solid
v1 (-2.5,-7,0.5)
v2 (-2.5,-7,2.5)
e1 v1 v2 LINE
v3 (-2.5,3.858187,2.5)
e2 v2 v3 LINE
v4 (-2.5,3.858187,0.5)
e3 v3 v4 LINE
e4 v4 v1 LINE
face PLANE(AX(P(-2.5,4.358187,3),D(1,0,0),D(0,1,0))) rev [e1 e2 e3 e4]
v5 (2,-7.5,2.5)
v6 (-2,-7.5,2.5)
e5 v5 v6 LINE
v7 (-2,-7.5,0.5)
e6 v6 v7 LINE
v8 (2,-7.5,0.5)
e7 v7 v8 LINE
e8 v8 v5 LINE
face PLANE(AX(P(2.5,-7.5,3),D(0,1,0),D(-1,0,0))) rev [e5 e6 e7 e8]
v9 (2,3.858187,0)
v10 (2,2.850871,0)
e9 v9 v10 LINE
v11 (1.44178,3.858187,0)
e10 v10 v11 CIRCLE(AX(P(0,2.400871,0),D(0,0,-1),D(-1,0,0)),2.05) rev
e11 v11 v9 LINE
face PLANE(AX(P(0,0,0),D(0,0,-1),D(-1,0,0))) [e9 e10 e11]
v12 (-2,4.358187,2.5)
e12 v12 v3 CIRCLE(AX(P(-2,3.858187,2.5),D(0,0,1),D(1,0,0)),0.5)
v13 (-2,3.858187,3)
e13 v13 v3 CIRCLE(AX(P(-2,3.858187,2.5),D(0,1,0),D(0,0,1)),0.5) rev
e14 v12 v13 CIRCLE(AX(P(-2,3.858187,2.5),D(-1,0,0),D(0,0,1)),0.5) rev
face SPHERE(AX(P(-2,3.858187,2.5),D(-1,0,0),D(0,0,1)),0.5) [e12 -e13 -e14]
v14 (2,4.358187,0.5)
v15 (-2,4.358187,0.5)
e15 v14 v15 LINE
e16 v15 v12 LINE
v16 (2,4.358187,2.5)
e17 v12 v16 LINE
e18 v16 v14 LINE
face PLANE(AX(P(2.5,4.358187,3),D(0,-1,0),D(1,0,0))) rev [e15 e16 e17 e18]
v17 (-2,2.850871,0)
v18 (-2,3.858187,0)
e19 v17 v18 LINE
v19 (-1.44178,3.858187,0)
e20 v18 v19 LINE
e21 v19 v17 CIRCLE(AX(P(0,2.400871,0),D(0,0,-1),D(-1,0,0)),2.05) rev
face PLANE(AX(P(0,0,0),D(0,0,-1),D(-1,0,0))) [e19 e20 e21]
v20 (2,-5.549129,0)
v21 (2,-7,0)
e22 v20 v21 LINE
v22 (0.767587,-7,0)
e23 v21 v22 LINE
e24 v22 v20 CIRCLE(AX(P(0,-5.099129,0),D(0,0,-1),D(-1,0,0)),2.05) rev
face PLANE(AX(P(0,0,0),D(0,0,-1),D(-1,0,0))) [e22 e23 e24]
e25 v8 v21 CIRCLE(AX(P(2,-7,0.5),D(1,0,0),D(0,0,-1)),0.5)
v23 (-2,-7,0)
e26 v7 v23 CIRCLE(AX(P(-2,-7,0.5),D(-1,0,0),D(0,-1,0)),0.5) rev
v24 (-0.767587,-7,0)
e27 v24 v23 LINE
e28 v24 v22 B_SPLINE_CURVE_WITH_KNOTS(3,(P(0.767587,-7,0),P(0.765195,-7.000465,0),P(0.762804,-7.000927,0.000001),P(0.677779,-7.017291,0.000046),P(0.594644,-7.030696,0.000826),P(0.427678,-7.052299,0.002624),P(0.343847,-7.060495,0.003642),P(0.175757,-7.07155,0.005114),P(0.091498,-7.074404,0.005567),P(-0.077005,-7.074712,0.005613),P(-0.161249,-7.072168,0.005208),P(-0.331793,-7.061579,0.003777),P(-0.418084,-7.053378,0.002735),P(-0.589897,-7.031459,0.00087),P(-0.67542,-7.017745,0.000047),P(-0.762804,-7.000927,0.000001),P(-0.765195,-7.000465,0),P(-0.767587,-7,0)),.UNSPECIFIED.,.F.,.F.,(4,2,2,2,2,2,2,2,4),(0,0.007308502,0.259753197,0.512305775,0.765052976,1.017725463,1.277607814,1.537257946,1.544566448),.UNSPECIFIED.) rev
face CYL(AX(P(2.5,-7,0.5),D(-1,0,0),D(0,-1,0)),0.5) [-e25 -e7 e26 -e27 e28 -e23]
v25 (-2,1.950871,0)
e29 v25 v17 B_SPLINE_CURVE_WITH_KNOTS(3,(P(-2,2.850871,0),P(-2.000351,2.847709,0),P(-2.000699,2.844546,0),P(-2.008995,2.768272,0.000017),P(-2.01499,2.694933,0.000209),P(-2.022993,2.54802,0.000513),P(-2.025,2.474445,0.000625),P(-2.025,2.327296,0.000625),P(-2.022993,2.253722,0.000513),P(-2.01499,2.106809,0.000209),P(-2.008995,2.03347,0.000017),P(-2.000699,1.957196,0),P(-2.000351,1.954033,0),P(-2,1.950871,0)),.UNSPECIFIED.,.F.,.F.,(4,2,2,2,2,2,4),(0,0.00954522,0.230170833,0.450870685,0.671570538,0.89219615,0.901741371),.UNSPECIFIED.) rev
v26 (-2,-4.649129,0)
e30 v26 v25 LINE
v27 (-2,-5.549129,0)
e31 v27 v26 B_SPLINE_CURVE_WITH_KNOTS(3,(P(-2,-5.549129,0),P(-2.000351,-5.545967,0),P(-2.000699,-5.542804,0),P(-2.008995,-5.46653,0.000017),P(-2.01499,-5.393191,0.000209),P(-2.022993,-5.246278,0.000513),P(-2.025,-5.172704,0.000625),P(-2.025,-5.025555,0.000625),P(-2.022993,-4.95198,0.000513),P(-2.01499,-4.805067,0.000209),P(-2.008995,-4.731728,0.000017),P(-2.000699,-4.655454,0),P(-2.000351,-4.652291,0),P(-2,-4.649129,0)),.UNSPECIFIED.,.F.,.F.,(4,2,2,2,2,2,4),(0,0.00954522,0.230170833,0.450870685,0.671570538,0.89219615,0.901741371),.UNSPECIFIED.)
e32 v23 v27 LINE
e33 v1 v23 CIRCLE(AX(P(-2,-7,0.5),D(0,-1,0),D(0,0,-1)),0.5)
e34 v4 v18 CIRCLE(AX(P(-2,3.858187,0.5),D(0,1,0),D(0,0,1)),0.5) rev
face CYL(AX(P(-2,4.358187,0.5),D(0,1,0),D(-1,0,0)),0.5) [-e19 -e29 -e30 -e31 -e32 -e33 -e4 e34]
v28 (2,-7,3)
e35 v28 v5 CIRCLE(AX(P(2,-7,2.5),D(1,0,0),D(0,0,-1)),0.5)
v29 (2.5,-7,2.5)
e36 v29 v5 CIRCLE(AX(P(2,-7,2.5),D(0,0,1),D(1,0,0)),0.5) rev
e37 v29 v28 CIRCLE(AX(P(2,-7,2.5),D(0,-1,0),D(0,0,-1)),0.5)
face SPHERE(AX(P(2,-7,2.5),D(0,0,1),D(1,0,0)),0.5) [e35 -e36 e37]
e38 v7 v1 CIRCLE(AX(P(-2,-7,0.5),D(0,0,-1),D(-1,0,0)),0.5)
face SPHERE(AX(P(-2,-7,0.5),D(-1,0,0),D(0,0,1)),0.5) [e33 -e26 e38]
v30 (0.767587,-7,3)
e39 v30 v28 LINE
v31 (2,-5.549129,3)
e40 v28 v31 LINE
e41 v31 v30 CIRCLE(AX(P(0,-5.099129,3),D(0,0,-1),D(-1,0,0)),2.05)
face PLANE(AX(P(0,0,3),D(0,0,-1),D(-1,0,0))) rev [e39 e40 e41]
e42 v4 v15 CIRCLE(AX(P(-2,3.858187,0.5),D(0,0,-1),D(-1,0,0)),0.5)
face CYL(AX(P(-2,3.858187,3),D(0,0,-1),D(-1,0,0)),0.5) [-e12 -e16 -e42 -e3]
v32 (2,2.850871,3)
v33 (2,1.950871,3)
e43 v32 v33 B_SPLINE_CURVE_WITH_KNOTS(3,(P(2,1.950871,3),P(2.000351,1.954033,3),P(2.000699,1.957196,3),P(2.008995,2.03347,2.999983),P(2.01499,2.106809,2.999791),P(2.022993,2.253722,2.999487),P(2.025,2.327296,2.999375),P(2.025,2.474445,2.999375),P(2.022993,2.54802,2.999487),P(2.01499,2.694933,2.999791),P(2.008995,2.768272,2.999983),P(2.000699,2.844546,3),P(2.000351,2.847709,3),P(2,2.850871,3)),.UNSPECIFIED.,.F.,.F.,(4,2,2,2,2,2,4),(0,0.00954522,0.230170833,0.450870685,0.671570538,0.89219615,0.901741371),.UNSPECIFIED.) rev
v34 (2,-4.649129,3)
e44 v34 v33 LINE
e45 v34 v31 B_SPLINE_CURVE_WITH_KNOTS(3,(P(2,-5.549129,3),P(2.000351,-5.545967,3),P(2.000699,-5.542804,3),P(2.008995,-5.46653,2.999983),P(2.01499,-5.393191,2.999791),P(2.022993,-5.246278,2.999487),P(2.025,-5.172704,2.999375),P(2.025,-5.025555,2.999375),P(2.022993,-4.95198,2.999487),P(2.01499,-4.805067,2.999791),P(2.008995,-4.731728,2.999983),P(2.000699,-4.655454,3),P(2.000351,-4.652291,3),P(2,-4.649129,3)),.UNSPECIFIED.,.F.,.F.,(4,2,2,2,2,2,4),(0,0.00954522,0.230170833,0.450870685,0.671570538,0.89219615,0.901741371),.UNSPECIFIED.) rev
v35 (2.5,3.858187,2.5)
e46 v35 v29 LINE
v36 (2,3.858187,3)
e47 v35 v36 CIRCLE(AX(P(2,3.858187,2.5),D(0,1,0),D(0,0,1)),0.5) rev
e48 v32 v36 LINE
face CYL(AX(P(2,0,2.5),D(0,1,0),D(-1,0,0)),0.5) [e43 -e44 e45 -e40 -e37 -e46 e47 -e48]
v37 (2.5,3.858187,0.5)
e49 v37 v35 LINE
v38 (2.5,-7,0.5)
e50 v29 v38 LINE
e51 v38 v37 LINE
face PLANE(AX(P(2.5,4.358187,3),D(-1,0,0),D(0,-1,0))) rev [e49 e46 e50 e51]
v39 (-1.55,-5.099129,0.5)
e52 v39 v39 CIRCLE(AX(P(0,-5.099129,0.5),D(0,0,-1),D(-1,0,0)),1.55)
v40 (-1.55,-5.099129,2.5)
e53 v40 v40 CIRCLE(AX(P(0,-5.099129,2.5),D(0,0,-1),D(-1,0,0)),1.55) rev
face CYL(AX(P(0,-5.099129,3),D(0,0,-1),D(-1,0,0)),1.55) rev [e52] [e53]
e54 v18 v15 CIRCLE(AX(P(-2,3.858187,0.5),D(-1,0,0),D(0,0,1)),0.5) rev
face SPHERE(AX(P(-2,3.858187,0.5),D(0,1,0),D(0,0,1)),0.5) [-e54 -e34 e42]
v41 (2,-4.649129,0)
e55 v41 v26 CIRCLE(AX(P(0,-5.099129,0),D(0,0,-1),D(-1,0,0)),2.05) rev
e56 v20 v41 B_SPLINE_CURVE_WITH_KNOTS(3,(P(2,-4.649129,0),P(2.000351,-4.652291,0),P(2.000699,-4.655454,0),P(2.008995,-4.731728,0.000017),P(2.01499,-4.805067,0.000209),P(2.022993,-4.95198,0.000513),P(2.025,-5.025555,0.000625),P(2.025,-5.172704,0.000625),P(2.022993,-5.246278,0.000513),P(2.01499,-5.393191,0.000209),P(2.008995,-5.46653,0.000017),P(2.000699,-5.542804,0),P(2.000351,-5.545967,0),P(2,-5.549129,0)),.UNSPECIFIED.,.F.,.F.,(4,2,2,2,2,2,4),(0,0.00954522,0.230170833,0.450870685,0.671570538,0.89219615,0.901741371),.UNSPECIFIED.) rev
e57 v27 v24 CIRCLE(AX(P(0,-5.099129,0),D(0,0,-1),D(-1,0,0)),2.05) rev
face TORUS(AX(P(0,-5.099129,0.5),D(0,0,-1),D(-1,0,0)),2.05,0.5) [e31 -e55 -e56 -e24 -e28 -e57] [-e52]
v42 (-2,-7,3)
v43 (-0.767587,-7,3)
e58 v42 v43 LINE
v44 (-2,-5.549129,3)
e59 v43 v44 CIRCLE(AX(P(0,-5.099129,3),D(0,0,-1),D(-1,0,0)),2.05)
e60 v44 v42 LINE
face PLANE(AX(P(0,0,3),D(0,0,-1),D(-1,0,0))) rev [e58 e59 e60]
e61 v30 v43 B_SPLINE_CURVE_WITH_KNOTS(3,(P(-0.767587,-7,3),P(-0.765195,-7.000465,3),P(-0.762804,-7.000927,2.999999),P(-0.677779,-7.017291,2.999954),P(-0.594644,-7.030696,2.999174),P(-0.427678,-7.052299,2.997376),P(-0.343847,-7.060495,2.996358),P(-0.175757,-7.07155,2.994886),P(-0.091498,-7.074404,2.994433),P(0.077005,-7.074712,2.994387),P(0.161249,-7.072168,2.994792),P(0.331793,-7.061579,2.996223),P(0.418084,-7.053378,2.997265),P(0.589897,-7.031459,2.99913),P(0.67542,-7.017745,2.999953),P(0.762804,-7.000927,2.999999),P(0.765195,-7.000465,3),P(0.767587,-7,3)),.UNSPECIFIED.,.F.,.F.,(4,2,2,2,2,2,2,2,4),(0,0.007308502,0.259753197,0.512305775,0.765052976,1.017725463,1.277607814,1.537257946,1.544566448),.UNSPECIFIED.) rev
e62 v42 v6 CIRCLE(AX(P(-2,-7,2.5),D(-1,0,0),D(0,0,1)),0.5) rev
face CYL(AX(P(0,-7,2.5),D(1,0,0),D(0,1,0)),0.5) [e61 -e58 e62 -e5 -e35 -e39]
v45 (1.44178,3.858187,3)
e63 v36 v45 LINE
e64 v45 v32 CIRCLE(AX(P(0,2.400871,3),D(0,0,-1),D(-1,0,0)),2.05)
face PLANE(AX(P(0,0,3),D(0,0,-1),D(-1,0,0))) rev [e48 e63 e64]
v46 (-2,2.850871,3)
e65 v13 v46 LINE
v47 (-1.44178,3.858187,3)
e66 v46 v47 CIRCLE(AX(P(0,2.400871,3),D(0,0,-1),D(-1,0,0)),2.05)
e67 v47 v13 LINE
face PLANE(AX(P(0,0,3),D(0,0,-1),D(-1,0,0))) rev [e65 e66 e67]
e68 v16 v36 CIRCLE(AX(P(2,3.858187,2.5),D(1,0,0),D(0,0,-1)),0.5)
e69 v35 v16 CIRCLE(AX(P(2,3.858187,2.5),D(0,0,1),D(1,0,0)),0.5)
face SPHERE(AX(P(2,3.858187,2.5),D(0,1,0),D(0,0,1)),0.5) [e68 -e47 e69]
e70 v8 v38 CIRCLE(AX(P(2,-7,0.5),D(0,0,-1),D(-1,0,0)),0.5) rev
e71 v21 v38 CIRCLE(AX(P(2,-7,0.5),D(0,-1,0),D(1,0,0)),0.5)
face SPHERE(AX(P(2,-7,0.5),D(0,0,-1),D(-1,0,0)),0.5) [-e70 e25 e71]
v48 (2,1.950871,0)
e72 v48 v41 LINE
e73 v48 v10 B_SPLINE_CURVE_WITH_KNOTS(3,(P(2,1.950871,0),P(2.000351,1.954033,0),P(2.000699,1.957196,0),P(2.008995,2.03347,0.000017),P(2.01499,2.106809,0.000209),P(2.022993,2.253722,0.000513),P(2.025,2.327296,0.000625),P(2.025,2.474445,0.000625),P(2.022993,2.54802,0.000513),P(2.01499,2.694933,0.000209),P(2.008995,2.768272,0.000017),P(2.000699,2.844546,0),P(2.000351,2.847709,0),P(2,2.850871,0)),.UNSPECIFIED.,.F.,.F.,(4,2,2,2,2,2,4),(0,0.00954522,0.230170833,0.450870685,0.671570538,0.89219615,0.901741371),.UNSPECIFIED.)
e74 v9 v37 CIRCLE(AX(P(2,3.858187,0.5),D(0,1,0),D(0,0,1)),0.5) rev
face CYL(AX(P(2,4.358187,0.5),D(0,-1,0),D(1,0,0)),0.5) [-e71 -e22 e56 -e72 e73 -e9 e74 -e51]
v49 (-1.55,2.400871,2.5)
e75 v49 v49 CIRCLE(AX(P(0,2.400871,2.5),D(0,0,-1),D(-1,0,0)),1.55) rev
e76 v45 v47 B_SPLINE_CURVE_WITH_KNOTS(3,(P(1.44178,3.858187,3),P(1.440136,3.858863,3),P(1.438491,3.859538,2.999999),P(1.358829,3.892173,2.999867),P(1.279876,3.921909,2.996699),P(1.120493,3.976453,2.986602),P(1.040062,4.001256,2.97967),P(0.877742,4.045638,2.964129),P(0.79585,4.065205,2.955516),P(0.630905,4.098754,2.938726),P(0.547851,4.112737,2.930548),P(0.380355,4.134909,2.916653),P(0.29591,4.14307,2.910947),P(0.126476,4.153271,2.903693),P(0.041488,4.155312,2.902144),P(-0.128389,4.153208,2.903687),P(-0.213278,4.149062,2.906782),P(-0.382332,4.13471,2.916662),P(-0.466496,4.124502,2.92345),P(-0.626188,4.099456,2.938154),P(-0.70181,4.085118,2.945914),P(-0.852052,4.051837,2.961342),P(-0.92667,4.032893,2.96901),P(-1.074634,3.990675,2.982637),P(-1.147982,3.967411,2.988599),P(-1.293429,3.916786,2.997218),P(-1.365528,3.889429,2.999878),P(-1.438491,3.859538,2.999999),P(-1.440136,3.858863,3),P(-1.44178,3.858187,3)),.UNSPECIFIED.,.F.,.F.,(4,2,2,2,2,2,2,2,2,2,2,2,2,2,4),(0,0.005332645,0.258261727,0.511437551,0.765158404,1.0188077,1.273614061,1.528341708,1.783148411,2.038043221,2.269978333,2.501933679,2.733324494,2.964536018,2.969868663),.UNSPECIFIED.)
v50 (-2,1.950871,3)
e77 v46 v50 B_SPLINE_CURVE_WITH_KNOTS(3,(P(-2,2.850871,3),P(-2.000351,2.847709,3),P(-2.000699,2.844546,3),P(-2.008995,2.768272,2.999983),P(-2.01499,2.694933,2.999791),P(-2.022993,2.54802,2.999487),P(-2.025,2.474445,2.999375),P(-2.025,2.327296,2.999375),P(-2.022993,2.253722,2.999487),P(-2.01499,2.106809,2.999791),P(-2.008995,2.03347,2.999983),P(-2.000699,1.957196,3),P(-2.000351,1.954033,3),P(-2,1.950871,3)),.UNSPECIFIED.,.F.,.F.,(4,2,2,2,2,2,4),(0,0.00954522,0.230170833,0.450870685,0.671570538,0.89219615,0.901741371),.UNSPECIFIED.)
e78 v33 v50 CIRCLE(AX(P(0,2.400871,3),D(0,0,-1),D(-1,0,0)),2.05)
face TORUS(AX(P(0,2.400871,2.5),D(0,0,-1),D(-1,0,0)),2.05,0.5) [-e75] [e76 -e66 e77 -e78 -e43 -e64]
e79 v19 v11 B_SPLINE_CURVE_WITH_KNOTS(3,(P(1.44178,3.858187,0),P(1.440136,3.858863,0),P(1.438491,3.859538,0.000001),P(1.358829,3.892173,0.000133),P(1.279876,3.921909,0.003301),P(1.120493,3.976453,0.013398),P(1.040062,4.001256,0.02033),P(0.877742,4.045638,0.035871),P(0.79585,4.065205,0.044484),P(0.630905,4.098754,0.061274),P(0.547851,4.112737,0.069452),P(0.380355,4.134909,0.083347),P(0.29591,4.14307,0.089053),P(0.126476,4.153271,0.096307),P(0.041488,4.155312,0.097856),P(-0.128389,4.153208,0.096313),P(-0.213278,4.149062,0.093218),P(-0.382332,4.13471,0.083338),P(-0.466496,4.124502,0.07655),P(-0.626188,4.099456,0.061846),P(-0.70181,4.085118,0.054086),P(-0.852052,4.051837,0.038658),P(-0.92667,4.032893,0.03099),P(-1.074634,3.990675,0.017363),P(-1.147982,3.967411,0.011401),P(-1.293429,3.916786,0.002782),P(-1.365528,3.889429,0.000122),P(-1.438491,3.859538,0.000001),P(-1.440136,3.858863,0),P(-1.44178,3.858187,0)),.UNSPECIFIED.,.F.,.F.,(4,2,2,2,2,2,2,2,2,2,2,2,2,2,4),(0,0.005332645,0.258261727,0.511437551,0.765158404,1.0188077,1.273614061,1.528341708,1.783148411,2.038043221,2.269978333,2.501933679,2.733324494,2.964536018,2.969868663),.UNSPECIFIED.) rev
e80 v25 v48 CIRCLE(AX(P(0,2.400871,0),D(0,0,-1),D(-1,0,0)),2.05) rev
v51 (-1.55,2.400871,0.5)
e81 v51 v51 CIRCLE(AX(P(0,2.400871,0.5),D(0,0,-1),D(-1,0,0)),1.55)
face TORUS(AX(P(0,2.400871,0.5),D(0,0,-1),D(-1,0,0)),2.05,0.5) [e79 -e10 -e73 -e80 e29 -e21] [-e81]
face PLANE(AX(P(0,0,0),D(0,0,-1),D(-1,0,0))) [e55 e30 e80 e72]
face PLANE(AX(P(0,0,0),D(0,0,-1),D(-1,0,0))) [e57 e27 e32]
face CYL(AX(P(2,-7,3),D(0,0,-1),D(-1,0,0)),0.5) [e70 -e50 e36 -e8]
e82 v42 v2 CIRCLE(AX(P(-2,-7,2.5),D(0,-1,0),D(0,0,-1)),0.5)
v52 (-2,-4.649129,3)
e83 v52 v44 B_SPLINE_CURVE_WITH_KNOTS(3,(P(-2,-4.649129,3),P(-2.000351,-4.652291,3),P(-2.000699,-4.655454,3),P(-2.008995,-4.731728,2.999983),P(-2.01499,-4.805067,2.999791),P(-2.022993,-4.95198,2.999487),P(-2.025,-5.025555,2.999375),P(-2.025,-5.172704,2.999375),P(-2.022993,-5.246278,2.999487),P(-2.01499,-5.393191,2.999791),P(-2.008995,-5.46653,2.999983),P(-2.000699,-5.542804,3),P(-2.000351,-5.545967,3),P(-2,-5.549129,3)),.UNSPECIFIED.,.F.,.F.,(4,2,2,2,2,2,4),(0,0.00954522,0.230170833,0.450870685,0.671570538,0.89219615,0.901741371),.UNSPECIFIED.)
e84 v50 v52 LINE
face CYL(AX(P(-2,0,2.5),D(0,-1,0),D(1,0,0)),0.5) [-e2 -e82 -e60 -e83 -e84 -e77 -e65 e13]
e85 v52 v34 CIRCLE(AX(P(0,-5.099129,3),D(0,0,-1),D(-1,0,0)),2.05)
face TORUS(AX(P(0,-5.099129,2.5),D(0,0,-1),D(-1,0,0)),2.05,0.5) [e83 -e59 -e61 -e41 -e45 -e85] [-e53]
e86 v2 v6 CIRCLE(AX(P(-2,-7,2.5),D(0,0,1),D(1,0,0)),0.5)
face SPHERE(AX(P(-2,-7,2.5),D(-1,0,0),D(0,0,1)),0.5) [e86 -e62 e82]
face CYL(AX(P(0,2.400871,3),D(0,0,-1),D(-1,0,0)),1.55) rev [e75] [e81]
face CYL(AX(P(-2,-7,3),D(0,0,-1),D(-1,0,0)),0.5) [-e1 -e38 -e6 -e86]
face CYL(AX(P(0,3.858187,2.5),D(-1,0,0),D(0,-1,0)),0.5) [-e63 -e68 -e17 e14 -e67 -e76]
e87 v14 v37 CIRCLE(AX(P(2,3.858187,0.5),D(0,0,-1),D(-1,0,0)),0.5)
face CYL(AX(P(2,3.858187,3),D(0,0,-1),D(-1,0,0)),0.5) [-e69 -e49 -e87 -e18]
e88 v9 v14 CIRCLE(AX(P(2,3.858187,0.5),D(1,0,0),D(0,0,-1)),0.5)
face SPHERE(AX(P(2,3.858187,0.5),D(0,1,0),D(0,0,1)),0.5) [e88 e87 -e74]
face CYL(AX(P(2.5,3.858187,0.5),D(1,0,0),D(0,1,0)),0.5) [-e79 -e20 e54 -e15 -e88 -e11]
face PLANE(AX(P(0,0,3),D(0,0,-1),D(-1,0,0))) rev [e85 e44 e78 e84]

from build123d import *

# Parameters (mm, degrees)
SKETCH1_W           = 5
SKETCH1_H           = 11.858187168
SKETCH1_R           = 1.55
BOSS_EXTRUDE1_DEPTH = 3
FILLET1_R           = 0.5


with BuildPart() as part:
    # Sketch1 → Boss-Extrude1 (new body)
    with BuildSketch(Plane.XY):
        with Locations((0, -1.570906416)):
            Rectangle(SKETCH1_W, SKETCH1_H)
        with Locations((0, 2.400870974)):
            Circle(SKETCH1_R, mode=Mode.SUBTRACT)
        with Locations((0, -5.099129026)):
            Circle(SKETCH1_R, mode=Mode.SUBTRACT)
    extrude(amount=BOSS_EXTRUDE1_DEPTH)

    # Fillet1
    # the kernel refuses this fillet: 0.5 mm, written as the material it takes off along each edge
    with BuildSketch(Plane(origin=(2, -7, 2.5), x_dir=(1, 0, 0), z_dir=(0, -1, 0))) as fillet1_piece_1_section:
        Polygon((0, 0), (FILLET1_R, 0), (FILLET1_R, FILLET1_R), (0, FILLET1_R), align=None)
    fillet1_piece_1 = extrude(amount=FILLET1_R, mode=Mode.PRIVATE)
    fillet1_piece_1 = fillet1_piece_1 - Plane(origin=(2, -7, 2.5), x_dir=(-0.7071067811865475, 0, -0.7071067811865475), z_dir=(0, -1, 0)) * Sphere(FILLET1_R, mode=Mode.PRIVATE)
    add(fillet1_piece_1, mode=Mode.SUBTRACT)
    with BuildSketch(Plane(origin=(2, 3.858187168, 2.5), x_dir=(1, 0, 0), z_dir=(0, 1, 0))) as fillet1_piece_2_section:
        Polygon((0, 0), (FILLET1_R, 0), (FILLET1_R, -FILLET1_R), (0, -FILLET1_R), align=None)
    fillet1_piece_2 = extrude(amount=FILLET1_R, mode=Mode.PRIVATE)
    fillet1_piece_2 = fillet1_piece_2 - Plane(origin=(2, 3.858187168, 2.5), x_dir=(-0.7071067811865475, 0, -0.7071067811865475), z_dir=(0, 1, 0)) * Sphere(FILLET1_R, mode=Mode.PRIVATE)
    add(fillet1_piece_2, mode=Mode.SUBTRACT)
    with BuildSketch(Plane(origin=(-2, 3.858187168, 2.5), x_dir=(-1, 0, 0), z_dir=(0, 1, 0))) as fillet1_piece_3_section:
        Polygon((0, 0), (FILLET1_R, 0), (FILLET1_R, FILLET1_R), (0, FILLET1_R), align=None)
    fillet1_piece_3 = extrude(amount=FILLET1_R, mode=Mode.PRIVATE)
    fillet1_piece_3 = fillet1_piece_3 - Plane(origin=(-2, 3.858187168, 2.5), x_dir=(0.7071067811865475, 0, -0.7071067811865475), z_dir=(0, 1, 0)) * Sphere(FILLET1_R, mode=Mode.PRIVATE)
    add(fillet1_piece_3, mode=Mode.SUBTRACT)
    with BuildSketch(Plane(origin=(-2, -7, 2.5), x_dir=(0, -1, 0), z_dir=(-1, 0, 0))) as fillet1_piece_4_section:
        Polygon((0, 0), (FILLET1_R, 0), (FILLET1_R, FILLET1_R), (0, FILLET1_R), align=None)
    fillet1_piece_4 = extrude(amount=FILLET1_R, mode=Mode.PRIVATE)
    fillet1_piece_4 = fillet1_piece_4 - Plane(origin=(-2, -7, 2.5), x_dir=(0, 0.7071067811865475, -0.7071067811865475), z_dir=(-1, 0, 0)) * Sphere(FILLET1_R, mode=Mode.PRIVATE)
    add(fillet1_piece_4, mode=Mode.SUBTRACT)
    with BuildSketch(Plane(origin=(2, 3.858187168, 0.5), x_dir=(1, 0, 0), z_dir=(0, 1, 0))) as fillet1_piece_5_section:
        Polygon((0, 0), (FILLET1_R, 0), (FILLET1_R, FILLET1_R), (0, FILLET1_R), align=None)
    fillet1_piece_5 = extrude(amount=FILLET1_R, mode=Mode.PRIVATE)
    fillet1_piece_5 = fillet1_piece_5 - Plane(origin=(2, 3.858187168, 0.5), x_dir=(-0.7071067811865475, 0, 0.7071067811865475), z_dir=(0, 1, 0)) * Sphere(FILLET1_R, mode=Mode.PRIVATE)
    add(fillet1_piece_5, mode=Mode.SUBTRACT)
    with BuildSketch(Plane(origin=(-2, 3.858187168, 0.5), x_dir=(-1, 0, 0), z_dir=(0, 1, 0))) as fillet1_piece_6_section:
        Polygon((0, 0), (FILLET1_R, 0), (FILLET1_R, -FILLET1_R), (0, -FILLET1_R), align=None)
    fillet1_piece_6 = extrude(amount=FILLET1_R, mode=Mode.PRIVATE)
    fillet1_piece_6 = fillet1_piece_6 - Plane(origin=(-2, 3.858187168, 0.5), x_dir=(0.7071067811865475, 0, 0.7071067811865475), z_dir=(0, 1, 0)) * Sphere(FILLET1_R, mode=Mode.PRIVATE)
    add(fillet1_piece_6, mode=Mode.SUBTRACT)
    with BuildSketch(Plane(origin=(2, -7, 0.5), x_dir=(1, 0, 0), z_dir=(0, -1, 0))) as fillet1_piece_7_section:
        Polygon((0, 0), (FILLET1_R, 0), (FILLET1_R, -FILLET1_R), (0, -FILLET1_R), align=None)
    fillet1_piece_7 = extrude(amount=FILLET1_R, mode=Mode.PRIVATE)
    fillet1_piece_7 = fillet1_piece_7 - Plane(origin=(2, -7, 0.5), x_dir=(-0.7071067811865475, 0, 0.7071067811865475), z_dir=(0, -1, 0)) * Sphere(FILLET1_R, mode=Mode.PRIVATE)
    add(fillet1_piece_7, mode=Mode.SUBTRACT)
    with BuildSketch(Plane(origin=(-2, -7, 0.5), x_dir=(0, -1, 0), z_dir=(-1, 0, 0))) as fillet1_piece_8_section:
        Polygon((0, 0), (FILLET1_R, 0), (FILLET1_R, -FILLET1_R), (0, -FILLET1_R), align=None)
    fillet1_piece_8 = extrude(amount=FILLET1_R, mode=Mode.PRIVATE)
    fillet1_piece_8 = fillet1_piece_8 - Plane(origin=(-2, -7, 0.5), x_dir=(0, 0.7071067811865475, 0.7071067811865475), z_dir=(-1, 0, 0)) * Sphere(FILLET1_R, mode=Mode.PRIVATE)
    add(fillet1_piece_8, mode=Mode.SUBTRACT)
    with BuildSketch(Plane(origin=(0, 2.400870974, 0), x_dir=(1, 0, 0), z_dir=(0, -1, 0))) as fillet1_piece_9:
        with BuildLine():
            CenterArc((1.55 + FILLET1_R, FILLET1_R), FILLET1_R, 180, 90)
            Line((1.55 + FILLET1_R, 0), (1.55, 0))
            Line((1.55, 0), (1.55, FILLET1_R))
        make_face()
    revolve(axis=Axis((0, 2.400870974, 0), (0, 0, 1)), mode=Mode.SUBTRACT)
    with BuildSketch(Plane(origin=(0, 2.400870974, 3), x_dir=(1, 0, 0), z_dir=(0, -1, 0))) as fillet1_piece_10:
        with BuildLine():
            CenterArc((1.55 + FILLET1_R, -FILLET1_R), FILLET1_R, 90, 90)
            Line((1.55 + FILLET1_R, 0), (1.55, 0))
            Line((1.55, 0), (1.55, -FILLET1_R))
        make_face()
    revolve(axis=Axis((0, 2.400870974, 3), (0, 0, 1)), mode=Mode.SUBTRACT)
    with BuildSketch(Plane(origin=(2.5, -7, 3), x_dir=(0, 0, -1), z_dir=(0, 1, 0)), Plane(origin=(-2.5, 3.858187168, 3), x_dir=(0, 0, -1), z_dir=(0, -1, 0))) as fillet1_piece_11:
        with BuildLine():
            CenterArc((FILLET1_R, FILLET1_R), FILLET1_R, 180, 90)
            Line((0, FILLET1_R), (0, 0))
            Line((0, 0), (FILLET1_R, 0))
        make_face()
    extrude(amount=10.858187168, mode=Mode.SUBTRACT)
    with BuildSketch(Plane(origin=(0, -5.099129026, 0), x_dir=(1, 0, 0), z_dir=(0, -1, 0))) as fillet1_piece_12:
        with BuildLine():
            CenterArc((1.55 + FILLET1_R, FILLET1_R), FILLET1_R, 180, 90)
            Line((1.55 + FILLET1_R, 0), (1.55, 0))
            Line((1.55, 0), (1.55, FILLET1_R))
        make_face()
    revolve(axis=Axis((0, -5.099129026, 0), (0, 0, 1)), mode=Mode.SUBTRACT)
    with BuildSketch(Plane(origin=(0, -5.099129026, 3), x_dir=(1, 0, 0), z_dir=(0, -1, 0))) as fillet1_piece_13:
        with BuildLine():
            CenterArc((1.55 + FILLET1_R, -FILLET1_R), FILLET1_R, 90, 90)
            Line((1.55 + FILLET1_R, 0), (1.55, 0))
            Line((1.55, 0), (1.55, -FILLET1_R))
        make_face()
    revolve(axis=Axis((0, -5.099129026, 3), (0, 0, 1)), mode=Mode.SUBTRACT)
    with BuildSketch(Plane(origin=(2, 4.358187168, 3), x_dir=(0, 0, -1), z_dir=(-1, 0, 0)), Plane(origin=(-2, -7.5, 3), x_dir=(0, 0, -1), z_dir=(1, 0, 0))) as fillet1_piece_14:
        with BuildLine():
            CenterArc((FILLET1_R, FILLET1_R), FILLET1_R, 180, 90)
            Line((0, FILLET1_R), (0, 0))
            Line((0, 0), (FILLET1_R, 0))
        make_face()
    extrude(amount=4, mode=Mode.SUBTRACT)
    with BuildSketch(Plane(origin=(2, 4.358187168, 0), x_dir=(0, 0, 1), z_dir=(-1, 0, 0)), Plane(origin=(-2, -7.5, 0), x_dir=(0, 0, 1), z_dir=(1, 0, 0))) as fillet1_piece_15:
        with BuildLine():
            CenterArc((FILLET1_R, -FILLET1_R), FILLET1_R, 90, 90)
            Line((0, -FILLET1_R), (0, 0))
            Line((0, 0), (FILLET1_R, 0))
        make_face()
    extrude(amount=4, mode=Mode.SUBTRACT)
    with BuildSketch(Plane(origin=(2.5, -7, 0), x_dir=(0, 0, 1), z_dir=(0, 1, 0)), Plane(origin=(-2.5, 3.858187168, 0), x_dir=(0, 0, 1), z_dir=(0, -1, 0))) as fillet1_piece_16:
        with BuildLine():
            CenterArc((FILLET1_R, -FILLET1_R), FILLET1_R, 90, 90)
            Line((0, -FILLET1_R), (0, 0))
            Line((0, 0), (FILLET1_R, 0))
        make_face()
    extrude(amount=10.858187168, mode=Mode.SUBTRACT)
    with BuildSketch(Plane(origin=(-2.5, 4.358187168, 0.5), x_dir=(1, 0, 0), z_dir=(0, 0, 1)), Plane(origin=(2.5, -7.5, 0.5), x_dir=(-1, 0, 0), z_dir=(0, 0, 1)), Plane(origin=(-2.5, -7.5, 0.5), x_dir=(0, 1, 0), z_dir=(0, 0, 1))) as fillet1_piece_17:
        with BuildLine():
            CenterArc((FILLET1_R, -FILLET1_R), FILLET1_R, 90, 90)
            Line((0, -FILLET1_R), (0, 0))
            Line((0, 0), (FILLET1_R, 0))
        make_face()
    extrude(amount=2, mode=Mode.SUBTRACT)
    with BuildSketch(Plane(origin=(2.5, 4.358187168, 0.5), x_dir=(-1, 0, 0), z_dir=(0, 0, 1))) as fillet1_piece_18:
        with BuildLine():
            CenterArc((FILLET1_R, FILLET1_R), FILLET1_R, 180, 90)
            Line((0, FILLET1_R), (0, 0))
            Line((0, 0), (FILLET1_R, 0))
        make_face()
    extrude(amount=2, mode=Mode.SUBTRACT)


solid = part.part
